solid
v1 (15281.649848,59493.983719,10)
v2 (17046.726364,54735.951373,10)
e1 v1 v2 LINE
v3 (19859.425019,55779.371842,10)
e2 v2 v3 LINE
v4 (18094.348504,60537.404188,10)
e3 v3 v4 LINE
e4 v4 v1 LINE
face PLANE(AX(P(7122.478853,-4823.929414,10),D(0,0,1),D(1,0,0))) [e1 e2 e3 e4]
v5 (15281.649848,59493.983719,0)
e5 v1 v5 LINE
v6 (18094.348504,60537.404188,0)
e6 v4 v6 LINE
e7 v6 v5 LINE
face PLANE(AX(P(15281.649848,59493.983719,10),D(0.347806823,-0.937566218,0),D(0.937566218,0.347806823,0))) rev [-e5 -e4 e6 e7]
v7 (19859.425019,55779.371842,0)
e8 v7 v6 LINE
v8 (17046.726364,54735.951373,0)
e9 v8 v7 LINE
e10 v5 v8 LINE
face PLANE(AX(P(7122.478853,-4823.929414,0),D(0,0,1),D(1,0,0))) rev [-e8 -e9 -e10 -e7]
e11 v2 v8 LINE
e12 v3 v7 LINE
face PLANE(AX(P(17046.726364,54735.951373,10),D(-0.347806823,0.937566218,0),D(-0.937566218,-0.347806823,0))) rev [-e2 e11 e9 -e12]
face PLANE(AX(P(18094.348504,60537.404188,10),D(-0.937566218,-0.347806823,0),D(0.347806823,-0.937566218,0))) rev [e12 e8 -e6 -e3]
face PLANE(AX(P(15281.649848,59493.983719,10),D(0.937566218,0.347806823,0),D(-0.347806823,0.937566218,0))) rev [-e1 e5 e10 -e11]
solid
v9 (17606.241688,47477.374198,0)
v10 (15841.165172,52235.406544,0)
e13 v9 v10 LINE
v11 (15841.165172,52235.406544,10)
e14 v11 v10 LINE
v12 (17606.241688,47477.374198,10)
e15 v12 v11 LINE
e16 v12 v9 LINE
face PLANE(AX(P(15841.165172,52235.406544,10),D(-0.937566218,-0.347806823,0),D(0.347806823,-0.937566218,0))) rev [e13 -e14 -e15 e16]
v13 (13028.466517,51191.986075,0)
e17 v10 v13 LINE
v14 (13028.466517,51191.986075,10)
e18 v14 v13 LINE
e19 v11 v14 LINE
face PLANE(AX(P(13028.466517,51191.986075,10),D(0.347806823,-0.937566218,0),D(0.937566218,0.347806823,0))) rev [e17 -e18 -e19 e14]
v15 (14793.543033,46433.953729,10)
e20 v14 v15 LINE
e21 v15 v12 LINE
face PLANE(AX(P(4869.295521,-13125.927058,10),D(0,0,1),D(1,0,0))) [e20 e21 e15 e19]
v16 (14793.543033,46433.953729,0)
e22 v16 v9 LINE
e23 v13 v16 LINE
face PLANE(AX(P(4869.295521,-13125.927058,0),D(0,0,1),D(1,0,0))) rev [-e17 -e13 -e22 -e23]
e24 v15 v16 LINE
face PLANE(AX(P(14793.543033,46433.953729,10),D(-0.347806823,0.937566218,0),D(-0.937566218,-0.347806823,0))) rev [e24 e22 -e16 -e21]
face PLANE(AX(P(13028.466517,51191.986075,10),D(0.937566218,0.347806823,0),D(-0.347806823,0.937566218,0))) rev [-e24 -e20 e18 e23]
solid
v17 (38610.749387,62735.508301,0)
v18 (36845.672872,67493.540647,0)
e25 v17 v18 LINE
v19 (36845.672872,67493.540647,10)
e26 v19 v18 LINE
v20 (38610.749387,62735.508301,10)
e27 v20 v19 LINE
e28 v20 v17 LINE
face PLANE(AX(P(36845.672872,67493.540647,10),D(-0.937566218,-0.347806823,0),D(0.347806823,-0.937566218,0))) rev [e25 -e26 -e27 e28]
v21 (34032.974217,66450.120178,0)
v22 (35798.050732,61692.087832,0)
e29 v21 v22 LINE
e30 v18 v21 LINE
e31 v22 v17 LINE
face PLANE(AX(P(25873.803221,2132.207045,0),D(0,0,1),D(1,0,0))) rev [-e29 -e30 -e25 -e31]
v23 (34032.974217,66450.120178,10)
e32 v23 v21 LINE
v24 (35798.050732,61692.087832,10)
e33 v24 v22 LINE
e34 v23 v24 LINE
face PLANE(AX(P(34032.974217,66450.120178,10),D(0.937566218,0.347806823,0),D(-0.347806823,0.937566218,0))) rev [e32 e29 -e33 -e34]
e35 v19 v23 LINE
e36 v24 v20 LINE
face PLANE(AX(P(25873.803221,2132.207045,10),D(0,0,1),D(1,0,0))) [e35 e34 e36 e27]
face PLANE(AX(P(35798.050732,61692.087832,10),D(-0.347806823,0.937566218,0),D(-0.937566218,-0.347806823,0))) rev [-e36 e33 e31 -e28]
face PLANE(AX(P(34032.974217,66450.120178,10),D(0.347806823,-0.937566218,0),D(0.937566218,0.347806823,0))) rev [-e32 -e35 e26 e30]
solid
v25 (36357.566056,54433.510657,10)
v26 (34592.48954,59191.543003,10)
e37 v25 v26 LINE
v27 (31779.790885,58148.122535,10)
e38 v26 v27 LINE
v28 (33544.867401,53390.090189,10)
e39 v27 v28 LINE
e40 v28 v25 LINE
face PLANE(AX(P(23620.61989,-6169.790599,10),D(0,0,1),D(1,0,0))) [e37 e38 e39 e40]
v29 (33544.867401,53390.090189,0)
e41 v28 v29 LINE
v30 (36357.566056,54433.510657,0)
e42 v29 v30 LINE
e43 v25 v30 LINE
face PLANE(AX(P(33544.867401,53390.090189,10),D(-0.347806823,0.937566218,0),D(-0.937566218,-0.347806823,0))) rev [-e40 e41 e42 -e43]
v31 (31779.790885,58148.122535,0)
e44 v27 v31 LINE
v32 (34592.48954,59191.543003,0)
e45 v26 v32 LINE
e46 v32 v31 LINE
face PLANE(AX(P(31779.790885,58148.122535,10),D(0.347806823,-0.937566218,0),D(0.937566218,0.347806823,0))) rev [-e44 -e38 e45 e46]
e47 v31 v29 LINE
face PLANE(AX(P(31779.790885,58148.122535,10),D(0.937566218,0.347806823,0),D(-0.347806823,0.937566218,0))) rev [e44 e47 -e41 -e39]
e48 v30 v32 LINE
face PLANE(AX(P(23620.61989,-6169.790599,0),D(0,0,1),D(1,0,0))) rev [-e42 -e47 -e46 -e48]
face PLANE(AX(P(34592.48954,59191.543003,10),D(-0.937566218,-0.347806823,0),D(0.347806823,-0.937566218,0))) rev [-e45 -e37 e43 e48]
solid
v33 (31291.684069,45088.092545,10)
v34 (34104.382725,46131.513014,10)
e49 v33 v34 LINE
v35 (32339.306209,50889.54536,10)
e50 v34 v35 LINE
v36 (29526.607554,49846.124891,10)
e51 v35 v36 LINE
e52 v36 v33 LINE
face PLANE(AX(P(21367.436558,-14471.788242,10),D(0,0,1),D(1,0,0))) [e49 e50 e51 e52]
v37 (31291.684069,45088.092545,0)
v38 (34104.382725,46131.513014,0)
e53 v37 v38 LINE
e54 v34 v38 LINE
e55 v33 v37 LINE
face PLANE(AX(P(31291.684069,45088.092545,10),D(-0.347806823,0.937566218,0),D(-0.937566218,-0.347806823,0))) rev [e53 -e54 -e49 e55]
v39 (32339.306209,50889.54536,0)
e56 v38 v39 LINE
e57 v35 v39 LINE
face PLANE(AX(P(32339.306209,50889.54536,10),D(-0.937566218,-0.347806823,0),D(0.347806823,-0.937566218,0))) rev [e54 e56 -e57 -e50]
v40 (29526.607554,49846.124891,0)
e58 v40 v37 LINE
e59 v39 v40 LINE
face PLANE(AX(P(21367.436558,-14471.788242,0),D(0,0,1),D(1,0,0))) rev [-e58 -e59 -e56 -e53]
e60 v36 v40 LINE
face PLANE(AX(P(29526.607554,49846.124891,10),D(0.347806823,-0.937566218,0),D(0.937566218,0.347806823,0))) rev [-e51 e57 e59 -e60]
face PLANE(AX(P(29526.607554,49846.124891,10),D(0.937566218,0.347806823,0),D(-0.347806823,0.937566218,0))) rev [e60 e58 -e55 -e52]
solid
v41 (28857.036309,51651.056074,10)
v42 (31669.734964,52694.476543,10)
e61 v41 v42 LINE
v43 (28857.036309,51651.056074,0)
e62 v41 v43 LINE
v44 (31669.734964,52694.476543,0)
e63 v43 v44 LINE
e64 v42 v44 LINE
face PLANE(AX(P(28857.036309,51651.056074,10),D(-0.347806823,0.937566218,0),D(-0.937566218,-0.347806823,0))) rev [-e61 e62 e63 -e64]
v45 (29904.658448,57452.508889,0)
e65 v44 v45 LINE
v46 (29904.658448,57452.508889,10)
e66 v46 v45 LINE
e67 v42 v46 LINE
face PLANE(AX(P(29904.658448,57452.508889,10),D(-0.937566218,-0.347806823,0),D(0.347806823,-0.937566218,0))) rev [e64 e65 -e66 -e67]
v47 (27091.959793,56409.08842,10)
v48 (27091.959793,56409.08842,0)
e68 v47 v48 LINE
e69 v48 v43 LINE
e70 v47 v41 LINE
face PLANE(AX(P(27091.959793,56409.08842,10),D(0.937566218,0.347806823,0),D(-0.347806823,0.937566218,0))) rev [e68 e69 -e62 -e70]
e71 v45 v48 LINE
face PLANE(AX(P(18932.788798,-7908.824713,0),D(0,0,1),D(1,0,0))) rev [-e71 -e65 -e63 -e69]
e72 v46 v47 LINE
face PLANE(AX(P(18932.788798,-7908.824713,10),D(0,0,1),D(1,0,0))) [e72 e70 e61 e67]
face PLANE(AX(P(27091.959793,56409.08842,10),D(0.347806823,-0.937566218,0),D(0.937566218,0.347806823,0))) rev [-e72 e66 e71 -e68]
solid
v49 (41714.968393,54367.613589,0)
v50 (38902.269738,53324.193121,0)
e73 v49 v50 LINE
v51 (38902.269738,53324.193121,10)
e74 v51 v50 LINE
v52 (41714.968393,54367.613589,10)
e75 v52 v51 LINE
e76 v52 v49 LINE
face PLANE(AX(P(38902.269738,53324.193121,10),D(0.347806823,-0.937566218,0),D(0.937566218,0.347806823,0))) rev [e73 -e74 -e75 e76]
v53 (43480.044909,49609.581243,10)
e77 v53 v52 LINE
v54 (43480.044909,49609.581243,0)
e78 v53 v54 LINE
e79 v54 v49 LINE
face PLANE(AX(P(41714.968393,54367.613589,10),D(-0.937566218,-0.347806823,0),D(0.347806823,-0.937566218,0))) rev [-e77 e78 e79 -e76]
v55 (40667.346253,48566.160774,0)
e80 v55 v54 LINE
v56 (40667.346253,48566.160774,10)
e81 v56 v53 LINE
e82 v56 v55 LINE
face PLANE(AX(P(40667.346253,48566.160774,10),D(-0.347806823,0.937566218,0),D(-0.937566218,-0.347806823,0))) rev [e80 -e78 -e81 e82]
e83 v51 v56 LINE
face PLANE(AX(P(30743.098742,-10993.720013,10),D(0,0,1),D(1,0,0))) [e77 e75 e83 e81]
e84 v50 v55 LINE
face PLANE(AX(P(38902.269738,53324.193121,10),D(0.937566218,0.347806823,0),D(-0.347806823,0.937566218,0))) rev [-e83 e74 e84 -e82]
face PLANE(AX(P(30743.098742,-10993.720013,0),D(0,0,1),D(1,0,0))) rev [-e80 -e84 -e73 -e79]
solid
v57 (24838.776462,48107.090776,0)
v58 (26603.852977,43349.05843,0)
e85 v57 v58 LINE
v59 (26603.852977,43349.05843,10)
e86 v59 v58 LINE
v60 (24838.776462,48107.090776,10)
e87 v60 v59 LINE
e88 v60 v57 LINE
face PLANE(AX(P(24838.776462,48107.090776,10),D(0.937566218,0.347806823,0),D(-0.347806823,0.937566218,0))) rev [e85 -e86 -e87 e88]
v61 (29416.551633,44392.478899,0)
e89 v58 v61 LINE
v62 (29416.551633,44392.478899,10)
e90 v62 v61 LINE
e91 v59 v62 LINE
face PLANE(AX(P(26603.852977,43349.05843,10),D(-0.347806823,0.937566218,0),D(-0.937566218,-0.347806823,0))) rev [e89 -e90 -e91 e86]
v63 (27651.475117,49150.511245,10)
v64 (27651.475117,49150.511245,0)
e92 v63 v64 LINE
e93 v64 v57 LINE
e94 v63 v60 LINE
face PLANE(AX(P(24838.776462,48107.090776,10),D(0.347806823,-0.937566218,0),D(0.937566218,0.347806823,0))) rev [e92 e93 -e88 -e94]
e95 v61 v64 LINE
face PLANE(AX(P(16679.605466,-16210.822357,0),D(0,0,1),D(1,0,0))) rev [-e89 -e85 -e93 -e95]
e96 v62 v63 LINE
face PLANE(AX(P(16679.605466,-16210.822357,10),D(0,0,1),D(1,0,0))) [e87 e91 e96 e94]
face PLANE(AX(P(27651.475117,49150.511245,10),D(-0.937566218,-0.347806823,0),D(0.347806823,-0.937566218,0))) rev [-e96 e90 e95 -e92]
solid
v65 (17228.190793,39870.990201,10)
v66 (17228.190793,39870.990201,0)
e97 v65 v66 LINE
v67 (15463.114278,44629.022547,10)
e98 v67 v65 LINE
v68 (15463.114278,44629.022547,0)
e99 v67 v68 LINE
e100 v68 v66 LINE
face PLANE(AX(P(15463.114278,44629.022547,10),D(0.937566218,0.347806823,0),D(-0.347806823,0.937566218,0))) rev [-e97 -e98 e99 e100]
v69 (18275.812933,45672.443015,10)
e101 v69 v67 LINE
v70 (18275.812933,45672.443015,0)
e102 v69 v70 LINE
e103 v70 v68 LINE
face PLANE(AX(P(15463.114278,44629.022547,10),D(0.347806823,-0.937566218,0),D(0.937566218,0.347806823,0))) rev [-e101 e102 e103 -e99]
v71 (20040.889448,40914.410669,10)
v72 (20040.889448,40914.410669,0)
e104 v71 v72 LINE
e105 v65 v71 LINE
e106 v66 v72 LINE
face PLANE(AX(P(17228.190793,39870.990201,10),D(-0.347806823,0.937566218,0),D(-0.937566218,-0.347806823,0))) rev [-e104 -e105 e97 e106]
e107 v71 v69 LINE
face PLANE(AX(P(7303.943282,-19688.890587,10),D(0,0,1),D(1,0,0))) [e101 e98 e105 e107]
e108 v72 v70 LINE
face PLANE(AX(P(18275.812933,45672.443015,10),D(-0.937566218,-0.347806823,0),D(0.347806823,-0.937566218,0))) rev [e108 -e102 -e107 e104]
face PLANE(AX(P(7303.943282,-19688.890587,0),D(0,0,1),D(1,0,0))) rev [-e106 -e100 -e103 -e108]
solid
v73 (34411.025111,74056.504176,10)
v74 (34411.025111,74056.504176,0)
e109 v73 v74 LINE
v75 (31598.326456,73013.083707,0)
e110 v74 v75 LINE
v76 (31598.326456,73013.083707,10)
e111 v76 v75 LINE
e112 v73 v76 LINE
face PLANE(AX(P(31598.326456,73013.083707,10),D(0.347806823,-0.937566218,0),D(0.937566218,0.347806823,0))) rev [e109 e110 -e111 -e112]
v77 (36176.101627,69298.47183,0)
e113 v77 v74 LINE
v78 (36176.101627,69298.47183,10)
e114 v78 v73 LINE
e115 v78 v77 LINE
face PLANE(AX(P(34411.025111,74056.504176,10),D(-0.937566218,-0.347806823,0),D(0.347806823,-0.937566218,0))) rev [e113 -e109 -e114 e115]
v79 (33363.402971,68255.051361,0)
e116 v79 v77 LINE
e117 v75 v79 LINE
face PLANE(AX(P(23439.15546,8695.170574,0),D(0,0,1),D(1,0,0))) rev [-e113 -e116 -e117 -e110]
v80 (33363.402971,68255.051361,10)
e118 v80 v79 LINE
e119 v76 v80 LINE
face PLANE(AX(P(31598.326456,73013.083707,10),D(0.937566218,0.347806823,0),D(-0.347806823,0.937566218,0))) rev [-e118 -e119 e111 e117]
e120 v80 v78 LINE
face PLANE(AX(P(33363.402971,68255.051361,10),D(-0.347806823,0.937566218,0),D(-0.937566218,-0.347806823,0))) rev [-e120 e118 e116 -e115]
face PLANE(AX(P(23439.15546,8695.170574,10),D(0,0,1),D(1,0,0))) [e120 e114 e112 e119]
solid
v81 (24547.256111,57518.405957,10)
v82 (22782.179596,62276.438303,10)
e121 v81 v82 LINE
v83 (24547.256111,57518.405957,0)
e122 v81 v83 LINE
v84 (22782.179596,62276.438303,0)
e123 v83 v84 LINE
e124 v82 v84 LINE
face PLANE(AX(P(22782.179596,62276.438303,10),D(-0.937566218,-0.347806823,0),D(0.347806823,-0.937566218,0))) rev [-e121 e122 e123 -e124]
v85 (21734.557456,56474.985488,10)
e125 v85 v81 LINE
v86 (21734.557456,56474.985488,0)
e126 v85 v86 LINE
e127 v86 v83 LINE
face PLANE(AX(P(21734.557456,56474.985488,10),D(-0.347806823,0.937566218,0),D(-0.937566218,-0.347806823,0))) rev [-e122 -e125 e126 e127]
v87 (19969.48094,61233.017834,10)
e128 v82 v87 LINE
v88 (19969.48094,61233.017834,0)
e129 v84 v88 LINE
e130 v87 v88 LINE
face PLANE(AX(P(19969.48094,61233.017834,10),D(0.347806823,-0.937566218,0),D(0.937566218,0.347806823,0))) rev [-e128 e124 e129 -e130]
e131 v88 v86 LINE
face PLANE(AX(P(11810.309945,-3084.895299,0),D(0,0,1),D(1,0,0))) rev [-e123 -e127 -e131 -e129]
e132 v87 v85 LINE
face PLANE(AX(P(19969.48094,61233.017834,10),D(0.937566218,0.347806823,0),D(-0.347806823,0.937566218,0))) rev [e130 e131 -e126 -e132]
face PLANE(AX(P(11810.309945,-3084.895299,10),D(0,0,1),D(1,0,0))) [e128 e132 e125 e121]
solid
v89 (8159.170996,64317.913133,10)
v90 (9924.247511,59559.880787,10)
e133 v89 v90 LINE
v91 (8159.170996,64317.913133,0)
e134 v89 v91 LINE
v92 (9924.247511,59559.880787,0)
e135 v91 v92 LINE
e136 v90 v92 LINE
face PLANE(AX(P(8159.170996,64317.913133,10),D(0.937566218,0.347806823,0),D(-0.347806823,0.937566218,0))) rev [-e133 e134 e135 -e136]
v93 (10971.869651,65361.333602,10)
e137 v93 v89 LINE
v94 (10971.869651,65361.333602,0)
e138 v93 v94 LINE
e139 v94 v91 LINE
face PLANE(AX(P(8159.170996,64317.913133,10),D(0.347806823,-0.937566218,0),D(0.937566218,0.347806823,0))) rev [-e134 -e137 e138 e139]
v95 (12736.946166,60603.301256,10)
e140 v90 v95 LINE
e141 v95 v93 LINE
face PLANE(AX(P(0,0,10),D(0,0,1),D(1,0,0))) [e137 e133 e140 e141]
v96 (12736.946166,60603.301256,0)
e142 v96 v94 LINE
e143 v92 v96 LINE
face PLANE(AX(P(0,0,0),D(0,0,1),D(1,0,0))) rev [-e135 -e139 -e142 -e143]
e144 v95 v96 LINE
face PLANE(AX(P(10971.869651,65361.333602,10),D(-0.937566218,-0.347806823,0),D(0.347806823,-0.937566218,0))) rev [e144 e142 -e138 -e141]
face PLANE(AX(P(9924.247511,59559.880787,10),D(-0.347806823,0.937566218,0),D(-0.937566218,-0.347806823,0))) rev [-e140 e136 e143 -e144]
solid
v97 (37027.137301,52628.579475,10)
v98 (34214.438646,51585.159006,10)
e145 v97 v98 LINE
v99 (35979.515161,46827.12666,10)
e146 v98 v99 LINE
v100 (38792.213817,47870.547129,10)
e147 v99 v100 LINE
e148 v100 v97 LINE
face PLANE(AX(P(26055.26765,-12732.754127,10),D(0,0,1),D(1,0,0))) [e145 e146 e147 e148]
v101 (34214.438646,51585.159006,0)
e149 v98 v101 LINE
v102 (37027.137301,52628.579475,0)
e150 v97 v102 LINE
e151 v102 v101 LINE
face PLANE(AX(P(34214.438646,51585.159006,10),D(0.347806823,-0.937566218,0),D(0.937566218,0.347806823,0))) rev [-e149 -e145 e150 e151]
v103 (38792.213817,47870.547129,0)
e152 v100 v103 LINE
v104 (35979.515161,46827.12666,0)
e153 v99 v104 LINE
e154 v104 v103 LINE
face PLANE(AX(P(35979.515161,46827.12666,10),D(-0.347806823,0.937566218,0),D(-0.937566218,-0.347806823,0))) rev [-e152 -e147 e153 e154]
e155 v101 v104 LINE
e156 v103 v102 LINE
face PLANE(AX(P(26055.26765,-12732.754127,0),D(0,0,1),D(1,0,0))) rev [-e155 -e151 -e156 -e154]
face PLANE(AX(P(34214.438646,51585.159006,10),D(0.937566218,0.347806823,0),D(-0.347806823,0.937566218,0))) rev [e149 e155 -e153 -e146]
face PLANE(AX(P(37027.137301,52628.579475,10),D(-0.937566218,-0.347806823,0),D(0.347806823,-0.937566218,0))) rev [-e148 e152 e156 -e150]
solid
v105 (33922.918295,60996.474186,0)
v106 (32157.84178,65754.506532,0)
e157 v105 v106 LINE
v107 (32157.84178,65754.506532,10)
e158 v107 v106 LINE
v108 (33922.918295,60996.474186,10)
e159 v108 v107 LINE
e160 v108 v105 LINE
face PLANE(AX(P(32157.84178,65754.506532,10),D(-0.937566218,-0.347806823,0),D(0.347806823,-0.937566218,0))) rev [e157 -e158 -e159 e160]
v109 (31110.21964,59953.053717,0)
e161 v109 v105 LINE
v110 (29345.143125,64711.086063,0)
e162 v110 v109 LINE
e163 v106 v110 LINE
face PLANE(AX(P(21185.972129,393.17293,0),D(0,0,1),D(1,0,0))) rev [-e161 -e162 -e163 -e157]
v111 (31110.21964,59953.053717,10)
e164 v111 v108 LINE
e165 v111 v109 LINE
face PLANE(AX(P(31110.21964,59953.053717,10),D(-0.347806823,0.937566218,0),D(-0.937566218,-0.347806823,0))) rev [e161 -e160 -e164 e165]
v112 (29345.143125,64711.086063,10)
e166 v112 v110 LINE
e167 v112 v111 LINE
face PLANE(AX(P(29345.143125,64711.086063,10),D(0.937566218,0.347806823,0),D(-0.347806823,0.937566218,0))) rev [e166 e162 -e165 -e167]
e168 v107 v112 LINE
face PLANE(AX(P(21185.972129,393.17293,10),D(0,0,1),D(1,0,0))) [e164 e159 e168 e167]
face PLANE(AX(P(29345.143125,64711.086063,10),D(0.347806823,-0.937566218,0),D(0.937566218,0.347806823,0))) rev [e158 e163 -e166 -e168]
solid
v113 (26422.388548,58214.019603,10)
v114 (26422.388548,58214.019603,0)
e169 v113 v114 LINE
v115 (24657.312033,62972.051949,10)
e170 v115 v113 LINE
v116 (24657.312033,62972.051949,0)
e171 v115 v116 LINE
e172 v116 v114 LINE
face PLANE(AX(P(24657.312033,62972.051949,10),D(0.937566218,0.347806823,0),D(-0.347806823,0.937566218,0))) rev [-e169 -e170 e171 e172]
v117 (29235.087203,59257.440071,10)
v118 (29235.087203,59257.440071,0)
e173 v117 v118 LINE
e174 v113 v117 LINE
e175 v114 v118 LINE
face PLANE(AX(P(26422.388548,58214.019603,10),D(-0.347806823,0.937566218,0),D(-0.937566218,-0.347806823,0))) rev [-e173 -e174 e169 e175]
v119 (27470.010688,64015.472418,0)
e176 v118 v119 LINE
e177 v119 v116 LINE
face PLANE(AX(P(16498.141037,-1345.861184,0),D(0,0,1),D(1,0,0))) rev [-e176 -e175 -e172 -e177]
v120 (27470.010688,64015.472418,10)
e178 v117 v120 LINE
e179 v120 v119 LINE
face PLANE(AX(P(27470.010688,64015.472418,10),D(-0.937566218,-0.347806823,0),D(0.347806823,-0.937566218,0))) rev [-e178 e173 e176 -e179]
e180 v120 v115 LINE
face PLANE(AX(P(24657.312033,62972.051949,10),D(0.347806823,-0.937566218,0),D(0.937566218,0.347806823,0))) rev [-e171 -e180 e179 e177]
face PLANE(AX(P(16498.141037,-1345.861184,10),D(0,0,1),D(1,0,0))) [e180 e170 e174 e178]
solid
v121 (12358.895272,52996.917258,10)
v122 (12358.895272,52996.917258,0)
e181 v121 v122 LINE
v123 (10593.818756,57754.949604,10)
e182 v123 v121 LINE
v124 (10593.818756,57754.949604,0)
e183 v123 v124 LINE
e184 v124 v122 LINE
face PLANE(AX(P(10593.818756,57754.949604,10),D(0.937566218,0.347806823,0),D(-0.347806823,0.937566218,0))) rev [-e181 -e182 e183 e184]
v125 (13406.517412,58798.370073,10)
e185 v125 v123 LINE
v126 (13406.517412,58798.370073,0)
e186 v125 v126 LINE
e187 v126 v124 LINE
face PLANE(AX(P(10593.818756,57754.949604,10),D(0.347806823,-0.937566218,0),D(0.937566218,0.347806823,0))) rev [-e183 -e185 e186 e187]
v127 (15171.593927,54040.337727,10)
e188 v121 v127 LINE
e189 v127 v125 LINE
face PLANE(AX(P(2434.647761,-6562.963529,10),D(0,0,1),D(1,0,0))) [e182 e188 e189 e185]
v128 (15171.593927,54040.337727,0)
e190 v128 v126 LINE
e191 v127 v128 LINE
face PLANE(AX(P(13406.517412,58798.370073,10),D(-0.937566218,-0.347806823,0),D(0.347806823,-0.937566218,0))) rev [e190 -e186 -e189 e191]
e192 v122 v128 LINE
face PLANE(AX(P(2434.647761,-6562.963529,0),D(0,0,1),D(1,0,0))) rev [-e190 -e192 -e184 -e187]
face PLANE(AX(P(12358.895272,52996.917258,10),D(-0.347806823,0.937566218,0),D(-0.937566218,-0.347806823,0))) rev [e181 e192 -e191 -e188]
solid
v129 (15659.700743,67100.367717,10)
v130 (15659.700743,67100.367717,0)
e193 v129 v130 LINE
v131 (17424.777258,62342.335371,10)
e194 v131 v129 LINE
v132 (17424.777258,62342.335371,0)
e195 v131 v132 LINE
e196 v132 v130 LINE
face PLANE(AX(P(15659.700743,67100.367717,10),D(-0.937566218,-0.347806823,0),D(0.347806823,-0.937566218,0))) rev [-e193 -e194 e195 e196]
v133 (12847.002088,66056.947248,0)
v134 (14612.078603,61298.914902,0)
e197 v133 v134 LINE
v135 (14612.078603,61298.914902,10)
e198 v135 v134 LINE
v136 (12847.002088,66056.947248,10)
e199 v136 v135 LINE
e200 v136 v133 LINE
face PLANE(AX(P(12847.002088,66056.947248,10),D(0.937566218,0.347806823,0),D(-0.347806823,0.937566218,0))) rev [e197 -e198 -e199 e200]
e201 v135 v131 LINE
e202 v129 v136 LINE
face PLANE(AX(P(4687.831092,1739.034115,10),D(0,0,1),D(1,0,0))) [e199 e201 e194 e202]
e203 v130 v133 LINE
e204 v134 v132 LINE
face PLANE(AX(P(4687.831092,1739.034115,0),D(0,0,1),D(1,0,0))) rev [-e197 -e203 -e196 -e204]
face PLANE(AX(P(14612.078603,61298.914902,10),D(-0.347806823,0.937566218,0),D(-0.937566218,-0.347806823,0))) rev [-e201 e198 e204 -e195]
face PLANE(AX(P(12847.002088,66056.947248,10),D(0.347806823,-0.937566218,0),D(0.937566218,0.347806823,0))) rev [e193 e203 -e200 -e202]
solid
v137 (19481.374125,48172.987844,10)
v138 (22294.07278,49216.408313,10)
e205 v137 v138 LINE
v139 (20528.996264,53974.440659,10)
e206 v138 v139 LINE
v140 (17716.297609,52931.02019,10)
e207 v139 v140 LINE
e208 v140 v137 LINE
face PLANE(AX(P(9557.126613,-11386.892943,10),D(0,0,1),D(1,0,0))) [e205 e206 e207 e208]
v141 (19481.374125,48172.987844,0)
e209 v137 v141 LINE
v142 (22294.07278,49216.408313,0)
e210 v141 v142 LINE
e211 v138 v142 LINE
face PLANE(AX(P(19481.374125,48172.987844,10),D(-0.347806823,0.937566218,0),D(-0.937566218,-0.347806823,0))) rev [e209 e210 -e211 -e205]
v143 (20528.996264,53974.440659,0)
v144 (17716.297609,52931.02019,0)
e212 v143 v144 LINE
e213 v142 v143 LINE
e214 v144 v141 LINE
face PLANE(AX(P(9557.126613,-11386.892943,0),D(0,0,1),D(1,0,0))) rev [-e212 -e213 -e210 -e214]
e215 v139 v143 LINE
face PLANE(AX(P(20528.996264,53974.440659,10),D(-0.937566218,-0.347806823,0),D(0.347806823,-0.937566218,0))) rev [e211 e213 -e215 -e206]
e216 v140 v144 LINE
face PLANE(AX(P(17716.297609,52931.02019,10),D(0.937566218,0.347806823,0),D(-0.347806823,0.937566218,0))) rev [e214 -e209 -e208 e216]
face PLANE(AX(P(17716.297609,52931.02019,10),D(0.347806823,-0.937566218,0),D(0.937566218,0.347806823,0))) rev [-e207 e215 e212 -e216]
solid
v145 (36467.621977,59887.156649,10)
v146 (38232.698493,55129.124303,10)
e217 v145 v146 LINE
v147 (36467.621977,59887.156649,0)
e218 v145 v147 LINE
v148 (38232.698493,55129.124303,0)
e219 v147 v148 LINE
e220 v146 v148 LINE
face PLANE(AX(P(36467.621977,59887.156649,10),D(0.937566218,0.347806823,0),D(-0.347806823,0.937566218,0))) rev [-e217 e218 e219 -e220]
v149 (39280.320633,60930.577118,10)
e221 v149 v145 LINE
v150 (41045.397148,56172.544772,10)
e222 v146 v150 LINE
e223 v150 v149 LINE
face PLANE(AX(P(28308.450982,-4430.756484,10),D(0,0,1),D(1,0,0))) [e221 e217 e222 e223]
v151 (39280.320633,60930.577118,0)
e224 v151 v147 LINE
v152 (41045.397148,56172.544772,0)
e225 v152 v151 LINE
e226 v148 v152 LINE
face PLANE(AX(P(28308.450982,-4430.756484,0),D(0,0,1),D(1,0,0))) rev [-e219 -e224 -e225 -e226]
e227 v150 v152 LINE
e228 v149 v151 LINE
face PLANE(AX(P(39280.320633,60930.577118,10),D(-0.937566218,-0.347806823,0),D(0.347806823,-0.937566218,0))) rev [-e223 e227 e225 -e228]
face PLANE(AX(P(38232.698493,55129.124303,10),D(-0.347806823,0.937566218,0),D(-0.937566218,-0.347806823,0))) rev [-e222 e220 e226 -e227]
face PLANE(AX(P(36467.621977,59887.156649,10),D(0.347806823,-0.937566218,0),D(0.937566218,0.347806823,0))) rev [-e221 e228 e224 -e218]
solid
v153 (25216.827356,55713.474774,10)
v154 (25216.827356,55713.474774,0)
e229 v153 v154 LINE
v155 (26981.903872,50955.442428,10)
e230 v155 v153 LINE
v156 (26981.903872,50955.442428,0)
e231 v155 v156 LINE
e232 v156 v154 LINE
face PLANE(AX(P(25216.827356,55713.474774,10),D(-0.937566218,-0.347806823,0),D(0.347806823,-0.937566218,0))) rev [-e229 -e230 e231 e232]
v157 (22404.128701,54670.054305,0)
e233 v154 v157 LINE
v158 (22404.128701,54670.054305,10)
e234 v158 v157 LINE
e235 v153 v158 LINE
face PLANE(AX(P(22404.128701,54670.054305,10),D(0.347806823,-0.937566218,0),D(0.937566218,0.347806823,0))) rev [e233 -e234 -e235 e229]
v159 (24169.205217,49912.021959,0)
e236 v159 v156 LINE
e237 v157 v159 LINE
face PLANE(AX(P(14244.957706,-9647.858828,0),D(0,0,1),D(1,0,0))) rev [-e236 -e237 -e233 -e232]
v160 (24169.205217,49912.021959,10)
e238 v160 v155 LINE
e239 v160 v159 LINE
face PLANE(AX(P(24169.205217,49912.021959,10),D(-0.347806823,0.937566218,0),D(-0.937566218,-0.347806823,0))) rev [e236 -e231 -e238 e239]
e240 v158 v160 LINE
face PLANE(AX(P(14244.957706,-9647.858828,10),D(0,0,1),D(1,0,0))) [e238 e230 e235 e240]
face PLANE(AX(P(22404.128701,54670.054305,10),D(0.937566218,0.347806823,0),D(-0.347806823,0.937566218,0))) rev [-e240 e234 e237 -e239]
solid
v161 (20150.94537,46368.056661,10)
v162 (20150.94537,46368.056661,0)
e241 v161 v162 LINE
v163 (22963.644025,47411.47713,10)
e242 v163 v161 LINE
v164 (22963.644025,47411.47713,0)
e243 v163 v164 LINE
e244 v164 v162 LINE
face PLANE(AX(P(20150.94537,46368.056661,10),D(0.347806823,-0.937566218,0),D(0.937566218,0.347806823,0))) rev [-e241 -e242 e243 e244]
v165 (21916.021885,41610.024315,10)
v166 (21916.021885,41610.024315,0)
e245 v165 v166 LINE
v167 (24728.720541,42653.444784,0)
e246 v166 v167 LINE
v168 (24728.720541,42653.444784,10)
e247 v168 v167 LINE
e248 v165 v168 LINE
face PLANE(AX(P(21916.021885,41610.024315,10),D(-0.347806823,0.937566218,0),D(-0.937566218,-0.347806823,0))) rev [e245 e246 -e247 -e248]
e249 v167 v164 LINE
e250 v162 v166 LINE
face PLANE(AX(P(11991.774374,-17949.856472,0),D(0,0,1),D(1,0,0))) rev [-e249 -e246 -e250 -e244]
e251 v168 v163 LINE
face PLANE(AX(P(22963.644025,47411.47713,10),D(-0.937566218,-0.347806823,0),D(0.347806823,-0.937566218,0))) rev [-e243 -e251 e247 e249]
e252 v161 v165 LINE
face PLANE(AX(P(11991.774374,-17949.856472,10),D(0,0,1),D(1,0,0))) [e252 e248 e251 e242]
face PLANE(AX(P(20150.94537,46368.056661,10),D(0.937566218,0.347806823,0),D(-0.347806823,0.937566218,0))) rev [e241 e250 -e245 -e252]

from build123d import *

# Parameters (mm, degrees)
BOSS_EXTRUDE1_DEPTH   = 10
LPATTERN1_START       = 35019.972121918
LPATTERN1_OUTLINE_W   = 5074.876048893
LPATTERN1_OUTLINE_H   = 10
LPATTERN1_DEPTH       = 3000
LPATTERN1_START_2     = 55019.972121918
LPATTERN1_2_OUTLINE_W = 5074.876048893
LPATTERN1_2_OUTLINE_H = 10
LPATTERN1_2_DEPTH     = 3000
LPATTERN1_START_3     = 30019.972121918
LPATTERN1_3_OUTLINE_W = 5074.876048893
LPATTERN1_3_OUTLINE_H = 10
LPATTERN1_3_DEPTH     = 2999.999999999
LPATTERN1_START_4     = 40019.972121918
LPATTERN1_4_OUTLINE_W = 5074.876048893
LPATTERN1_4_OUTLINE_H = 10
LPATTERN1_4_DEPTH     = 3000
LPATTERN1_START_5     = 45019.972121918
LPATTERN1_5_OUTLINE_W = 5074.876048893
LPATTERN1_5_OUTLINE_H = 10
LPATTERN1_5_DEPTH     = 3000
LPATTERN1_START_6     = 50019.972121918
LPATTERN1_6_OUTLINE_W = 5074.876048893
LPATTERN1_6_OUTLINE_H = 10
LPATTERN1_6_DEPTH     = 3000


# Read off the part's stored shape, not the designer's step: LPattern1
with BuildPart() as part:
    # Sketch1 → Boss-Extrude1 (new body)
    with BuildSketch(Plane.XY):
        Polygon((8159.170995645, 64317.913133173), (10971.869650874, 65361.333602048), (12736.946166348, 60603.301255988), (9924.247511118, 59559.880787113), align=None)
    extrude(amount=BOSS_EXTRUDE1_DEPTH)


with BuildPart() as body_2:
    # LPattern1 outline → LPattern1 (new body)
    with BuildSketch(Plane(origin=(0, 0, 0), x_dir=(-0.3478068229585231, 0.937566218409931, 0), z_dir=(0.9375662184099312, 0.34780682295852305, 0)).offset(LPATTERN1_START)):
        with Locations((33927.049225871, 5)):
            Rectangle(LPATTERN1_OUTLINE_W, LPATTERN1_OUTLINE_H)
        with Locations((40927.049225871, 5)):
            Rectangle(LPATTERN1_OUTLINE_W, LPATTERN1_OUTLINE_H)
        with Locations((47927.049225871, 5)):
            Rectangle(LPATTERN1_OUTLINE_W, LPATTERN1_OUTLINE_H)
        with Locations((54927.049225871, 5)):
            Rectangle(LPATTERN1_OUTLINE_W, LPATTERN1_OUTLINE_H)
    extrude(amount=LPATTERN1_DEPTH)


with BuildPart() as body_3:
    # LPattern1 2 outline → LPattern1 2 (new body)
    with BuildSketch(Plane(origin=(0, 0, 0), x_dir=(-0.3478068229585231, 0.937566218409931, 0), z_dir=(0.9375662184099312, 0.34780682295852305, 0)).offset(LPATTERN1_START_2)):
        with Locations((33927.049225871, 5)):
            Rectangle(LPATTERN1_2_OUTLINE_W, LPATTERN1_2_OUTLINE_H)
        with Locations((40927.049225871, 5)):
            Rectangle(LPATTERN1_2_OUTLINE_W, LPATTERN1_2_OUTLINE_H)
        with Locations((47927.049225871, 5)):
            Rectangle(LPATTERN1_2_OUTLINE_W, LPATTERN1_2_OUTLINE_H)
        with Locations((54927.049225871, 5)):
            Rectangle(LPATTERN1_2_OUTLINE_W, LPATTERN1_2_OUTLINE_H)
    extrude(amount=LPATTERN1_2_DEPTH)


with BuildPart() as body_4:
    # LPattern1 3 outline → LPattern1 3 (new body)
    with BuildSketch(Plane(origin=(0, 0, 0), x_dir=(-0.3478068229585231, 0.937566218409931, 0), z_dir=(0.9375662184099312, 0.34780682295852305, 0)).offset(LPATTERN1_START_3)):
        with Locations((33927.049225871, 5)):
            Rectangle(LPATTERN1_3_OUTLINE_W, LPATTERN1_3_OUTLINE_H)
        with Locations((40927.049225871, 5)):
            Rectangle(LPATTERN1_3_OUTLINE_W, LPATTERN1_3_OUTLINE_H)
        with Locations((47927.049225871, 5)):
            Rectangle(LPATTERN1_3_OUTLINE_W, LPATTERN1_3_OUTLINE_H)
    extrude(amount=LPATTERN1_3_DEPTH)


with BuildPart() as body_5:
    # LPattern1 4 outline → LPattern1 4 (new body)
    with BuildSketch(Plane(origin=(0, 0, 0), x_dir=(-0.3478068229585231, 0.937566218409931, 0), z_dir=(0.9375662184099312, 0.34780682295852305, 0)).offset(LPATTERN1_START_4)):
        with Locations((33927.049225871, 5)):
            Rectangle(LPATTERN1_4_OUTLINE_W, LPATTERN1_4_OUTLINE_H)
        with Locations((40927.049225871, 5)):
            Rectangle(LPATTERN1_4_OUTLINE_W, LPATTERN1_4_OUTLINE_H)
        with Locations((47927.049225871, 5)):
            Rectangle(LPATTERN1_4_OUTLINE_W, LPATTERN1_4_OUTLINE_H)
    extrude(amount=LPATTERN1_4_DEPTH)


with BuildPart() as body_6:
    # LPattern1 5 outline → LPattern1 5 (new body)
    with BuildSketch(Plane(origin=(0, 0, 0), x_dir=(-0.3478068229585231, 0.937566218409931, 0), z_dir=(0.9375662184099312, 0.34780682295852305, 0)).offset(LPATTERN1_START_5)):
        with Locations((33927.049225871, 5)):
            Rectangle(LPATTERN1_5_OUTLINE_W, LPATTERN1_5_OUTLINE_H)
        with Locations((40927.049225871, 5)):
            Rectangle(LPATTERN1_5_OUTLINE_W, LPATTERN1_5_OUTLINE_H)
        with Locations((47927.049225871, 5)):
            Rectangle(LPATTERN1_5_OUTLINE_W, LPATTERN1_5_OUTLINE_H)
    extrude(amount=LPATTERN1_5_DEPTH)


with BuildPart() as body_7:
    # LPattern1 6 outline → LPattern1 6 (new body)
    with BuildSketch(Plane(origin=(0, 0, 0), x_dir=(-0.3478068229585231, 0.937566218409931, 0), z_dir=(0.9375662184099312, 0.34780682295852305, 0)).offset(LPATTERN1_START_6)):
        with Locations((33927.049225871, 5)):
            Rectangle(LPATTERN1_6_OUTLINE_W, LPATTERN1_6_OUTLINE_H)
        with Locations((40927.049225871, 5)):
            Rectangle(LPATTERN1_6_OUTLINE_W, LPATTERN1_6_OUTLINE_H)
        with Locations((47927.049225871, 5)):
            Rectangle(LPATTERN1_6_OUTLINE_W, LPATTERN1_6_OUTLINE_H)
    extrude(amount=LPATTERN1_6_DEPTH)


solid = Compound([part.part, body_2.part, body_3.part, body_4.part, body_5.part, body_6.part, body_7.part])
